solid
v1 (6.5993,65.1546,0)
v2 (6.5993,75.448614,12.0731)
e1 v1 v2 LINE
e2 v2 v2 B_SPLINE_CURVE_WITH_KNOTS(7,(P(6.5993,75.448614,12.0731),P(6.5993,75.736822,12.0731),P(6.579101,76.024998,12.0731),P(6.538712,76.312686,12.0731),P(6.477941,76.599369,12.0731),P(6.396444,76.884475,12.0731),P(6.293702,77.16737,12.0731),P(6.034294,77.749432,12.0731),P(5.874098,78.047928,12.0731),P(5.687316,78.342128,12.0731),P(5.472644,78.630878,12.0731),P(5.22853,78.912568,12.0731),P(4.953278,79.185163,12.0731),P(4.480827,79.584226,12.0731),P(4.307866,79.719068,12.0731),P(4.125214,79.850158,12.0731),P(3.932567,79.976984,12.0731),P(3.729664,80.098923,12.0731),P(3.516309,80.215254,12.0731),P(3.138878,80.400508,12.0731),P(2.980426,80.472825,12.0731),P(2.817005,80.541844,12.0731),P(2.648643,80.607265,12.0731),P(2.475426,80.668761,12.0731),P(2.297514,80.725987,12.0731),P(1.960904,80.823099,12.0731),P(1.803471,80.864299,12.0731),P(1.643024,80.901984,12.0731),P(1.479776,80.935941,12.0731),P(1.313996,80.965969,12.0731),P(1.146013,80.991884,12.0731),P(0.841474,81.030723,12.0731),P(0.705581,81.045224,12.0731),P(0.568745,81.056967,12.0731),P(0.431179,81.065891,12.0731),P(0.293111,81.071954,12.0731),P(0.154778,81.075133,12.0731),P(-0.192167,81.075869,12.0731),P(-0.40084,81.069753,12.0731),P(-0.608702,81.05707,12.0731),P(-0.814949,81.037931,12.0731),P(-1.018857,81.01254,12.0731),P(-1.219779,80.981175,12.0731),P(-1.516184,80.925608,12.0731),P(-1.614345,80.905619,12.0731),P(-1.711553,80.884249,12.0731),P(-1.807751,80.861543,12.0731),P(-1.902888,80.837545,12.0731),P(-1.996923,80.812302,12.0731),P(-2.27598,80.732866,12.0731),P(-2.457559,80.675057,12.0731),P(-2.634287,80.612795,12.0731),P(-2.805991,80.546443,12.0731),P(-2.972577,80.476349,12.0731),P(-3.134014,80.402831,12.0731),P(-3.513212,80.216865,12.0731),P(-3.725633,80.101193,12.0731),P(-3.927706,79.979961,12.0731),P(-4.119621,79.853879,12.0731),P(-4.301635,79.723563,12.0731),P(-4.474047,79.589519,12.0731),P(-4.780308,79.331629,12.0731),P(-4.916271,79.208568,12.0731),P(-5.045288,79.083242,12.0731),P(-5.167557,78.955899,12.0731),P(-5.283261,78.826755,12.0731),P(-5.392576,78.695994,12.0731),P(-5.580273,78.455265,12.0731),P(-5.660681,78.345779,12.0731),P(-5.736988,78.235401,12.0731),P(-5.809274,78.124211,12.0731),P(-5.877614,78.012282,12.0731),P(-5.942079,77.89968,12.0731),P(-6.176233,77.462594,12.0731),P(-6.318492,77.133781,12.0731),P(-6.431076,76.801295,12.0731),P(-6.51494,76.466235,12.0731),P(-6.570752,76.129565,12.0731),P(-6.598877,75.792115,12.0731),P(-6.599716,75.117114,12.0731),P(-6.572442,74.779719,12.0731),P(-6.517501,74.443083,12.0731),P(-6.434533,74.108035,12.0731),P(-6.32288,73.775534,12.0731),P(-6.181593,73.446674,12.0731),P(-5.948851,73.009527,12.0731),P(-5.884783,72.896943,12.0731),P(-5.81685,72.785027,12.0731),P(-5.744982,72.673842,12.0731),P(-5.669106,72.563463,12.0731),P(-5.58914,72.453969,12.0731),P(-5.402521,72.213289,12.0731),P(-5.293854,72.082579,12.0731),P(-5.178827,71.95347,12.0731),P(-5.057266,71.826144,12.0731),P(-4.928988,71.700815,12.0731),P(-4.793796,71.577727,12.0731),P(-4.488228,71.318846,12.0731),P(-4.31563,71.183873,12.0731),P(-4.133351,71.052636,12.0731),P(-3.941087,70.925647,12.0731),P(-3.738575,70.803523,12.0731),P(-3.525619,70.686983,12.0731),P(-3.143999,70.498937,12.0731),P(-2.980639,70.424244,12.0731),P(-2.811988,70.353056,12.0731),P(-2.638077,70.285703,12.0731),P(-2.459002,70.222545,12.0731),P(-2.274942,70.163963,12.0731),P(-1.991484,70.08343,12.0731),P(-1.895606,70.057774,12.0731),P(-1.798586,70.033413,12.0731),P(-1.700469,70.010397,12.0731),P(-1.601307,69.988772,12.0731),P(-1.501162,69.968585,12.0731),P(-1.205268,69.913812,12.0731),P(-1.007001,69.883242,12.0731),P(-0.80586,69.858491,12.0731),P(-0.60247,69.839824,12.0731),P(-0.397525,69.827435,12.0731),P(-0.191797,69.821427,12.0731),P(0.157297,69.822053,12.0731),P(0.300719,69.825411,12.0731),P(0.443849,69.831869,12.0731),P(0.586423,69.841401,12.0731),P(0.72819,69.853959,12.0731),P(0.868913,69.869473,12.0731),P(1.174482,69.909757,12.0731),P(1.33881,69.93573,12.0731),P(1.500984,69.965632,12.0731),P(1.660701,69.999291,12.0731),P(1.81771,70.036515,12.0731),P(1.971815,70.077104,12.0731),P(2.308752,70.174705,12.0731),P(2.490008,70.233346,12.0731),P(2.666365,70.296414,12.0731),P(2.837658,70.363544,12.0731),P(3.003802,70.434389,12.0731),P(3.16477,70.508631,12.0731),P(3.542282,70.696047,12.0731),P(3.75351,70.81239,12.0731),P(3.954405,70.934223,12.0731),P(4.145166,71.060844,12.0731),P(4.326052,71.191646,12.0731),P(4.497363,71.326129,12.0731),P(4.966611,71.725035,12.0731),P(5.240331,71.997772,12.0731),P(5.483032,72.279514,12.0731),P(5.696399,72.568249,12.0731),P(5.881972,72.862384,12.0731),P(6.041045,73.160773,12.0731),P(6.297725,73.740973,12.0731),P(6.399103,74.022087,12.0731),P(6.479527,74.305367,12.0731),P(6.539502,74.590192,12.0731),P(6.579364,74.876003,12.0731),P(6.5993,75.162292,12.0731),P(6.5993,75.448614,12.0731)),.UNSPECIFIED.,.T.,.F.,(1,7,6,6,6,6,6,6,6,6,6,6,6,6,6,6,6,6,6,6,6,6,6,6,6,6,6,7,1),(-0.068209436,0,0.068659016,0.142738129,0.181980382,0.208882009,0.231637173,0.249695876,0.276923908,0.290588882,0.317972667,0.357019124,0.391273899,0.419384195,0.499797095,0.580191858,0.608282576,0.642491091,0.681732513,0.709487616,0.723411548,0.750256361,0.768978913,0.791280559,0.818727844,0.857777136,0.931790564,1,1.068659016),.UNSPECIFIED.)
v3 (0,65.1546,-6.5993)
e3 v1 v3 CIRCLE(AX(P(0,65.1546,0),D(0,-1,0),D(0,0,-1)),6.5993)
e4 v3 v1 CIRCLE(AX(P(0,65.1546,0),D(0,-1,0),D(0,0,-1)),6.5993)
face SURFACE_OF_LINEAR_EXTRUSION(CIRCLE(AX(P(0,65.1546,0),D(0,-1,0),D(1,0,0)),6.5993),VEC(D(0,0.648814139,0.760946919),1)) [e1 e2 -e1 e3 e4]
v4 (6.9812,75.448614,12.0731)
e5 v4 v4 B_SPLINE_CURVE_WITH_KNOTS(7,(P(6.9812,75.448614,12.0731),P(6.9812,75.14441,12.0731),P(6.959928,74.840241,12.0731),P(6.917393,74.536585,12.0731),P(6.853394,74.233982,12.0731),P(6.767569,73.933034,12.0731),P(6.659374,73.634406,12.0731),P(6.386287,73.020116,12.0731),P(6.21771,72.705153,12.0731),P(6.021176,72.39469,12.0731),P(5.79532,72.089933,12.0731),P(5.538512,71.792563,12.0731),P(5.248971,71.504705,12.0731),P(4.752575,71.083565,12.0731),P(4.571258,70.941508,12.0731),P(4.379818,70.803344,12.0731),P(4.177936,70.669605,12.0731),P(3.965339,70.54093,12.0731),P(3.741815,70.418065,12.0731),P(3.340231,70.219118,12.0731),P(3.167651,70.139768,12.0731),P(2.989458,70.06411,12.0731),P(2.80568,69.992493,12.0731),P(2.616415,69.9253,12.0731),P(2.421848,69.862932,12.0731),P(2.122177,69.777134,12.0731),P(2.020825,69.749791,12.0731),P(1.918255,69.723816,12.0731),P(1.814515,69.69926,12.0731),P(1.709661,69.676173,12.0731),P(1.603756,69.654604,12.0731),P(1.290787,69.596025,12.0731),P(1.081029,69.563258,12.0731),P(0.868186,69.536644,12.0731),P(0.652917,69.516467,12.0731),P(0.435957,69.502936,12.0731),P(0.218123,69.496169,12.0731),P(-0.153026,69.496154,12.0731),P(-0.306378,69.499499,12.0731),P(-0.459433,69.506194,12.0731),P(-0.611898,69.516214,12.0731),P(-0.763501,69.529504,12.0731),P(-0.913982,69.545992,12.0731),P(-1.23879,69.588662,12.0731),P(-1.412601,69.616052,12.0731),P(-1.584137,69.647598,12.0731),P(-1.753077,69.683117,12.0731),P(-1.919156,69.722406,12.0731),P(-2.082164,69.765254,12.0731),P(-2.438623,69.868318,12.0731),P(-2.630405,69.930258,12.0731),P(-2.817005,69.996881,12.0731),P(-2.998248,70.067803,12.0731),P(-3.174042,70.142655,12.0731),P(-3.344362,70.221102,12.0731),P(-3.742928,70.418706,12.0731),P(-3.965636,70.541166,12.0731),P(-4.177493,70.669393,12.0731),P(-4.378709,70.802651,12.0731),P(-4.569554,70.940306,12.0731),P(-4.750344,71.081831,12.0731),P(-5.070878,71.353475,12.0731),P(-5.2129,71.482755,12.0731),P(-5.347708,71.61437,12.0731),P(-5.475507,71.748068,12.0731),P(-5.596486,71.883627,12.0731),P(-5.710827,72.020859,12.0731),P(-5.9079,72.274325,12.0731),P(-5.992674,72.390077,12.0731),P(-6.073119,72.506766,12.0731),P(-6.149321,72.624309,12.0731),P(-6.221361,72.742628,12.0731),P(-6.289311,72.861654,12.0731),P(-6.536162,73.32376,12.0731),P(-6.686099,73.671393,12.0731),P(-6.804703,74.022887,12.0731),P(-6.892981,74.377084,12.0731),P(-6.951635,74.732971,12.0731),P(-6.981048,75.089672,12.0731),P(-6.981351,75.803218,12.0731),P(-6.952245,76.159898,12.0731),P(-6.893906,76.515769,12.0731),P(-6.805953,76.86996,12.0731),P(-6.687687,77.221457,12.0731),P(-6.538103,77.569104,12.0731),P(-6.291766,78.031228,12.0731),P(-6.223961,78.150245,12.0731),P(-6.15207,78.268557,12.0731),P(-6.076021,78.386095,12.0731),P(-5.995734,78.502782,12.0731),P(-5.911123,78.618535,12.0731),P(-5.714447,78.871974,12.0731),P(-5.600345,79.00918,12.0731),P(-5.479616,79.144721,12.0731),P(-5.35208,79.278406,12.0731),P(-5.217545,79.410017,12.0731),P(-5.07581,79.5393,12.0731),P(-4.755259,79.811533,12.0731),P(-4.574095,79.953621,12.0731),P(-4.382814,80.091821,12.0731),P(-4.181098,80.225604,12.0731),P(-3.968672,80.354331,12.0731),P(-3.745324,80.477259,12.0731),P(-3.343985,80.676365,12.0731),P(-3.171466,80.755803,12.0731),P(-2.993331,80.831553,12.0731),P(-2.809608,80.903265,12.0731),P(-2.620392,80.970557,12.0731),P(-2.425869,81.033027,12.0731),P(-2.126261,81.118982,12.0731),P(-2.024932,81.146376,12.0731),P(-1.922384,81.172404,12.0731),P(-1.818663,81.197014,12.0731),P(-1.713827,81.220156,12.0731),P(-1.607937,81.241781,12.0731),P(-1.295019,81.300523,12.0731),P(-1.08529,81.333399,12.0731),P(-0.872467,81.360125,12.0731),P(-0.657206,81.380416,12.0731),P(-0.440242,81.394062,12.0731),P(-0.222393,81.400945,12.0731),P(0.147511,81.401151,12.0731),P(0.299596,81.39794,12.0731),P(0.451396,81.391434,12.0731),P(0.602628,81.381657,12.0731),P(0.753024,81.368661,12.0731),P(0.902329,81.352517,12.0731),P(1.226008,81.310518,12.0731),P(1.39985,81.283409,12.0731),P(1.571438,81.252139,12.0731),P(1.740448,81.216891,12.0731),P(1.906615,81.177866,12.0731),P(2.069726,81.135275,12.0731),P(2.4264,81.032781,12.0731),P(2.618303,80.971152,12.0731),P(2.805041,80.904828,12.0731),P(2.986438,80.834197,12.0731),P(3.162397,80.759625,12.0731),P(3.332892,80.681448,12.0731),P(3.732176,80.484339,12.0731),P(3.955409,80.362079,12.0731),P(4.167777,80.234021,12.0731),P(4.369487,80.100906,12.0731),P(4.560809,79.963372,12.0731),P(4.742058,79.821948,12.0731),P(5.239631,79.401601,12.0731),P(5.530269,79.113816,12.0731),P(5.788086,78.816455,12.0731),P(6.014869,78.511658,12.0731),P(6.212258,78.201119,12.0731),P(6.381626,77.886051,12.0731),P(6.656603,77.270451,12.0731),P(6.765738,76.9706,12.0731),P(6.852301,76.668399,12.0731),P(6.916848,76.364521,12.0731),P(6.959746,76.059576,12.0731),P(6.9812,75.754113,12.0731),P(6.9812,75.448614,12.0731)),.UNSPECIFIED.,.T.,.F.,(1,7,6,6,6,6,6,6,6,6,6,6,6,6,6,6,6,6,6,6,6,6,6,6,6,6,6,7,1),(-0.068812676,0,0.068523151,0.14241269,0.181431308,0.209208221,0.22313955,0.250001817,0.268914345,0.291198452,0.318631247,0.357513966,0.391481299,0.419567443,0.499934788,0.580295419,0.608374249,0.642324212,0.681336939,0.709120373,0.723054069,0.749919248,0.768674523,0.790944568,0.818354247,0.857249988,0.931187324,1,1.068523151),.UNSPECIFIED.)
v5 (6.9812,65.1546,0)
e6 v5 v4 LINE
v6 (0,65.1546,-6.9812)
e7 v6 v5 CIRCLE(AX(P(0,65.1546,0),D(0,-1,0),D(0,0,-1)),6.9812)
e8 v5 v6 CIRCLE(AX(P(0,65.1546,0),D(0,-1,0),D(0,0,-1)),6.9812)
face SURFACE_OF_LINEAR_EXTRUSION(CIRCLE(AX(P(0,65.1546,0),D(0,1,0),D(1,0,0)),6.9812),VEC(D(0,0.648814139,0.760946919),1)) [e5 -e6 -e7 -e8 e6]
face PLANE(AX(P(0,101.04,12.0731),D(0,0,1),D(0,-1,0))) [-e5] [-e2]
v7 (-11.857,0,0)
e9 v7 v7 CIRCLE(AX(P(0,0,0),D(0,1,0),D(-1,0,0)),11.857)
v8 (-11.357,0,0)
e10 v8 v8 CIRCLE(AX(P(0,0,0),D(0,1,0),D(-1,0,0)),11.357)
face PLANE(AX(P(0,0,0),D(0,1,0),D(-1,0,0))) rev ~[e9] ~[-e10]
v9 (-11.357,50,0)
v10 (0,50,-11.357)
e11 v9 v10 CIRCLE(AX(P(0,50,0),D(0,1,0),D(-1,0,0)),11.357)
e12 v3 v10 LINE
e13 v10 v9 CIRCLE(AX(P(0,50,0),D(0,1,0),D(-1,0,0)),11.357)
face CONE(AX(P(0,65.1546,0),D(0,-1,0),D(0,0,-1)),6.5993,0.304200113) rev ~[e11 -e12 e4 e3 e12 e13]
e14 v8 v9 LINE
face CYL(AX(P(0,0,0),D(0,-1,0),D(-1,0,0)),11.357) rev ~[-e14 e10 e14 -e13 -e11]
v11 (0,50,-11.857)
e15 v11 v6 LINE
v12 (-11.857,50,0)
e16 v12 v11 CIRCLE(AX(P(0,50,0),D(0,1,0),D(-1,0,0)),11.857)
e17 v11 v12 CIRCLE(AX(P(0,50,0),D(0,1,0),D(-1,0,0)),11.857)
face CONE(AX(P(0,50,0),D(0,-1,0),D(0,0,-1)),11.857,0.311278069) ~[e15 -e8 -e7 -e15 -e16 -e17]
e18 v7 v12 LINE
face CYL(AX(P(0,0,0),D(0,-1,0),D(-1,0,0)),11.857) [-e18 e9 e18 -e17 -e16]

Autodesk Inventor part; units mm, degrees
ref_plane "YZ Plane" through (0, 0, 0) normal (1, 0, 0) x (0, 1, 0)
ref_plane "XZ Plane" through (0, 0, 0) normal (0, 1, 0) x (-1, 0, 0)
sketch "Esquisse1" plane through (0, 0, 0) normal (0, 1, 0) x (-1, 0, 0)
  circle A0 centre (0, 0) radius 11.857
  circle A1 centre (0, 0) radius 11.357
  dimension "d0" = 23.714
  dimension "d1" = 0.5
extrude "Extrusion1" add sketch "Esquisse1" along normal blind 50
sketch "Esquisse3" plane through (0, 0, 0) normal (1, 0, 0) x (0, 1, 0)
  line L0 (50, -11.857) -> (50, 11.857) projected
  line L1 (50, -11.857) -> (50, -11.357)
  line L2 (50, -11.857) -> (65.1546, -6.9812)
  line L3 (65.1546, -6.9812) -> (65.1546, -6.5993)
  line L4 (65.1546, -6.5993) -> (50, -11.357)
  point P0 (0, 0)
sketch "Esquisse4" plane through (0, 0, 0) normal (1, 0, 0) x (0, 1, 0)
  line L0 (89.7518, 0) -> (0, 0)
  line L1 (50, -11.857) -> (50, 11.857) projected
  line L2 (65.5189, 0) -> (87.7272, 26.0465)
revolve "Révolution1" add sketch "Esquisse3" angle 360 about axis through (0, 89.7518, 0) along (0, -1, 0)
sketch "Esquisse6" plane through (0, 0, 0) normal (1, 0, 0) x (0, 1, 0)
  line L0 (0, -11.857) -> (0, 11.857) projected
  line L1 (0, 11.857) -> (102.0428, 11.857)
  point P0 (0, 0)
ref_plane "Plan de construction1" through (0, 0, 11.857) normal (0, 0, 1) x (1, 0, 0)
sketch "Esquisse10" plane through (0, 65.1546, 0) normal (0, 1, 0) x (1, 0, 0)
  circle A0 centre (0, 0) radius 6.5993
  circle A1 centre (0, 0) radius 6.9812
sweep "Balayage1" add profiles "Esquisse10" path "Esquisse4" path curves L2
sketch "Esquisse13" plane through (0, 0, 0) normal (1, 0, 0) x (0, 1, 0)
  line L0 (101.04, 12.0731) -> (64.1022, 12.0731)
  line L1 (64.1022, 12.0731) -> (64.1022, 38.95)
  line L2 (64.1022, 38.95) -> (101.04, 38.95)
  line L3 (101.04, 38.95) -> (101.04, 12.0731)
  point P0 (0, 0)
extrude "Extrusion2" cut sketch "Esquisse13" against normal mid plane 50
properties material "PMMA Plastic"
